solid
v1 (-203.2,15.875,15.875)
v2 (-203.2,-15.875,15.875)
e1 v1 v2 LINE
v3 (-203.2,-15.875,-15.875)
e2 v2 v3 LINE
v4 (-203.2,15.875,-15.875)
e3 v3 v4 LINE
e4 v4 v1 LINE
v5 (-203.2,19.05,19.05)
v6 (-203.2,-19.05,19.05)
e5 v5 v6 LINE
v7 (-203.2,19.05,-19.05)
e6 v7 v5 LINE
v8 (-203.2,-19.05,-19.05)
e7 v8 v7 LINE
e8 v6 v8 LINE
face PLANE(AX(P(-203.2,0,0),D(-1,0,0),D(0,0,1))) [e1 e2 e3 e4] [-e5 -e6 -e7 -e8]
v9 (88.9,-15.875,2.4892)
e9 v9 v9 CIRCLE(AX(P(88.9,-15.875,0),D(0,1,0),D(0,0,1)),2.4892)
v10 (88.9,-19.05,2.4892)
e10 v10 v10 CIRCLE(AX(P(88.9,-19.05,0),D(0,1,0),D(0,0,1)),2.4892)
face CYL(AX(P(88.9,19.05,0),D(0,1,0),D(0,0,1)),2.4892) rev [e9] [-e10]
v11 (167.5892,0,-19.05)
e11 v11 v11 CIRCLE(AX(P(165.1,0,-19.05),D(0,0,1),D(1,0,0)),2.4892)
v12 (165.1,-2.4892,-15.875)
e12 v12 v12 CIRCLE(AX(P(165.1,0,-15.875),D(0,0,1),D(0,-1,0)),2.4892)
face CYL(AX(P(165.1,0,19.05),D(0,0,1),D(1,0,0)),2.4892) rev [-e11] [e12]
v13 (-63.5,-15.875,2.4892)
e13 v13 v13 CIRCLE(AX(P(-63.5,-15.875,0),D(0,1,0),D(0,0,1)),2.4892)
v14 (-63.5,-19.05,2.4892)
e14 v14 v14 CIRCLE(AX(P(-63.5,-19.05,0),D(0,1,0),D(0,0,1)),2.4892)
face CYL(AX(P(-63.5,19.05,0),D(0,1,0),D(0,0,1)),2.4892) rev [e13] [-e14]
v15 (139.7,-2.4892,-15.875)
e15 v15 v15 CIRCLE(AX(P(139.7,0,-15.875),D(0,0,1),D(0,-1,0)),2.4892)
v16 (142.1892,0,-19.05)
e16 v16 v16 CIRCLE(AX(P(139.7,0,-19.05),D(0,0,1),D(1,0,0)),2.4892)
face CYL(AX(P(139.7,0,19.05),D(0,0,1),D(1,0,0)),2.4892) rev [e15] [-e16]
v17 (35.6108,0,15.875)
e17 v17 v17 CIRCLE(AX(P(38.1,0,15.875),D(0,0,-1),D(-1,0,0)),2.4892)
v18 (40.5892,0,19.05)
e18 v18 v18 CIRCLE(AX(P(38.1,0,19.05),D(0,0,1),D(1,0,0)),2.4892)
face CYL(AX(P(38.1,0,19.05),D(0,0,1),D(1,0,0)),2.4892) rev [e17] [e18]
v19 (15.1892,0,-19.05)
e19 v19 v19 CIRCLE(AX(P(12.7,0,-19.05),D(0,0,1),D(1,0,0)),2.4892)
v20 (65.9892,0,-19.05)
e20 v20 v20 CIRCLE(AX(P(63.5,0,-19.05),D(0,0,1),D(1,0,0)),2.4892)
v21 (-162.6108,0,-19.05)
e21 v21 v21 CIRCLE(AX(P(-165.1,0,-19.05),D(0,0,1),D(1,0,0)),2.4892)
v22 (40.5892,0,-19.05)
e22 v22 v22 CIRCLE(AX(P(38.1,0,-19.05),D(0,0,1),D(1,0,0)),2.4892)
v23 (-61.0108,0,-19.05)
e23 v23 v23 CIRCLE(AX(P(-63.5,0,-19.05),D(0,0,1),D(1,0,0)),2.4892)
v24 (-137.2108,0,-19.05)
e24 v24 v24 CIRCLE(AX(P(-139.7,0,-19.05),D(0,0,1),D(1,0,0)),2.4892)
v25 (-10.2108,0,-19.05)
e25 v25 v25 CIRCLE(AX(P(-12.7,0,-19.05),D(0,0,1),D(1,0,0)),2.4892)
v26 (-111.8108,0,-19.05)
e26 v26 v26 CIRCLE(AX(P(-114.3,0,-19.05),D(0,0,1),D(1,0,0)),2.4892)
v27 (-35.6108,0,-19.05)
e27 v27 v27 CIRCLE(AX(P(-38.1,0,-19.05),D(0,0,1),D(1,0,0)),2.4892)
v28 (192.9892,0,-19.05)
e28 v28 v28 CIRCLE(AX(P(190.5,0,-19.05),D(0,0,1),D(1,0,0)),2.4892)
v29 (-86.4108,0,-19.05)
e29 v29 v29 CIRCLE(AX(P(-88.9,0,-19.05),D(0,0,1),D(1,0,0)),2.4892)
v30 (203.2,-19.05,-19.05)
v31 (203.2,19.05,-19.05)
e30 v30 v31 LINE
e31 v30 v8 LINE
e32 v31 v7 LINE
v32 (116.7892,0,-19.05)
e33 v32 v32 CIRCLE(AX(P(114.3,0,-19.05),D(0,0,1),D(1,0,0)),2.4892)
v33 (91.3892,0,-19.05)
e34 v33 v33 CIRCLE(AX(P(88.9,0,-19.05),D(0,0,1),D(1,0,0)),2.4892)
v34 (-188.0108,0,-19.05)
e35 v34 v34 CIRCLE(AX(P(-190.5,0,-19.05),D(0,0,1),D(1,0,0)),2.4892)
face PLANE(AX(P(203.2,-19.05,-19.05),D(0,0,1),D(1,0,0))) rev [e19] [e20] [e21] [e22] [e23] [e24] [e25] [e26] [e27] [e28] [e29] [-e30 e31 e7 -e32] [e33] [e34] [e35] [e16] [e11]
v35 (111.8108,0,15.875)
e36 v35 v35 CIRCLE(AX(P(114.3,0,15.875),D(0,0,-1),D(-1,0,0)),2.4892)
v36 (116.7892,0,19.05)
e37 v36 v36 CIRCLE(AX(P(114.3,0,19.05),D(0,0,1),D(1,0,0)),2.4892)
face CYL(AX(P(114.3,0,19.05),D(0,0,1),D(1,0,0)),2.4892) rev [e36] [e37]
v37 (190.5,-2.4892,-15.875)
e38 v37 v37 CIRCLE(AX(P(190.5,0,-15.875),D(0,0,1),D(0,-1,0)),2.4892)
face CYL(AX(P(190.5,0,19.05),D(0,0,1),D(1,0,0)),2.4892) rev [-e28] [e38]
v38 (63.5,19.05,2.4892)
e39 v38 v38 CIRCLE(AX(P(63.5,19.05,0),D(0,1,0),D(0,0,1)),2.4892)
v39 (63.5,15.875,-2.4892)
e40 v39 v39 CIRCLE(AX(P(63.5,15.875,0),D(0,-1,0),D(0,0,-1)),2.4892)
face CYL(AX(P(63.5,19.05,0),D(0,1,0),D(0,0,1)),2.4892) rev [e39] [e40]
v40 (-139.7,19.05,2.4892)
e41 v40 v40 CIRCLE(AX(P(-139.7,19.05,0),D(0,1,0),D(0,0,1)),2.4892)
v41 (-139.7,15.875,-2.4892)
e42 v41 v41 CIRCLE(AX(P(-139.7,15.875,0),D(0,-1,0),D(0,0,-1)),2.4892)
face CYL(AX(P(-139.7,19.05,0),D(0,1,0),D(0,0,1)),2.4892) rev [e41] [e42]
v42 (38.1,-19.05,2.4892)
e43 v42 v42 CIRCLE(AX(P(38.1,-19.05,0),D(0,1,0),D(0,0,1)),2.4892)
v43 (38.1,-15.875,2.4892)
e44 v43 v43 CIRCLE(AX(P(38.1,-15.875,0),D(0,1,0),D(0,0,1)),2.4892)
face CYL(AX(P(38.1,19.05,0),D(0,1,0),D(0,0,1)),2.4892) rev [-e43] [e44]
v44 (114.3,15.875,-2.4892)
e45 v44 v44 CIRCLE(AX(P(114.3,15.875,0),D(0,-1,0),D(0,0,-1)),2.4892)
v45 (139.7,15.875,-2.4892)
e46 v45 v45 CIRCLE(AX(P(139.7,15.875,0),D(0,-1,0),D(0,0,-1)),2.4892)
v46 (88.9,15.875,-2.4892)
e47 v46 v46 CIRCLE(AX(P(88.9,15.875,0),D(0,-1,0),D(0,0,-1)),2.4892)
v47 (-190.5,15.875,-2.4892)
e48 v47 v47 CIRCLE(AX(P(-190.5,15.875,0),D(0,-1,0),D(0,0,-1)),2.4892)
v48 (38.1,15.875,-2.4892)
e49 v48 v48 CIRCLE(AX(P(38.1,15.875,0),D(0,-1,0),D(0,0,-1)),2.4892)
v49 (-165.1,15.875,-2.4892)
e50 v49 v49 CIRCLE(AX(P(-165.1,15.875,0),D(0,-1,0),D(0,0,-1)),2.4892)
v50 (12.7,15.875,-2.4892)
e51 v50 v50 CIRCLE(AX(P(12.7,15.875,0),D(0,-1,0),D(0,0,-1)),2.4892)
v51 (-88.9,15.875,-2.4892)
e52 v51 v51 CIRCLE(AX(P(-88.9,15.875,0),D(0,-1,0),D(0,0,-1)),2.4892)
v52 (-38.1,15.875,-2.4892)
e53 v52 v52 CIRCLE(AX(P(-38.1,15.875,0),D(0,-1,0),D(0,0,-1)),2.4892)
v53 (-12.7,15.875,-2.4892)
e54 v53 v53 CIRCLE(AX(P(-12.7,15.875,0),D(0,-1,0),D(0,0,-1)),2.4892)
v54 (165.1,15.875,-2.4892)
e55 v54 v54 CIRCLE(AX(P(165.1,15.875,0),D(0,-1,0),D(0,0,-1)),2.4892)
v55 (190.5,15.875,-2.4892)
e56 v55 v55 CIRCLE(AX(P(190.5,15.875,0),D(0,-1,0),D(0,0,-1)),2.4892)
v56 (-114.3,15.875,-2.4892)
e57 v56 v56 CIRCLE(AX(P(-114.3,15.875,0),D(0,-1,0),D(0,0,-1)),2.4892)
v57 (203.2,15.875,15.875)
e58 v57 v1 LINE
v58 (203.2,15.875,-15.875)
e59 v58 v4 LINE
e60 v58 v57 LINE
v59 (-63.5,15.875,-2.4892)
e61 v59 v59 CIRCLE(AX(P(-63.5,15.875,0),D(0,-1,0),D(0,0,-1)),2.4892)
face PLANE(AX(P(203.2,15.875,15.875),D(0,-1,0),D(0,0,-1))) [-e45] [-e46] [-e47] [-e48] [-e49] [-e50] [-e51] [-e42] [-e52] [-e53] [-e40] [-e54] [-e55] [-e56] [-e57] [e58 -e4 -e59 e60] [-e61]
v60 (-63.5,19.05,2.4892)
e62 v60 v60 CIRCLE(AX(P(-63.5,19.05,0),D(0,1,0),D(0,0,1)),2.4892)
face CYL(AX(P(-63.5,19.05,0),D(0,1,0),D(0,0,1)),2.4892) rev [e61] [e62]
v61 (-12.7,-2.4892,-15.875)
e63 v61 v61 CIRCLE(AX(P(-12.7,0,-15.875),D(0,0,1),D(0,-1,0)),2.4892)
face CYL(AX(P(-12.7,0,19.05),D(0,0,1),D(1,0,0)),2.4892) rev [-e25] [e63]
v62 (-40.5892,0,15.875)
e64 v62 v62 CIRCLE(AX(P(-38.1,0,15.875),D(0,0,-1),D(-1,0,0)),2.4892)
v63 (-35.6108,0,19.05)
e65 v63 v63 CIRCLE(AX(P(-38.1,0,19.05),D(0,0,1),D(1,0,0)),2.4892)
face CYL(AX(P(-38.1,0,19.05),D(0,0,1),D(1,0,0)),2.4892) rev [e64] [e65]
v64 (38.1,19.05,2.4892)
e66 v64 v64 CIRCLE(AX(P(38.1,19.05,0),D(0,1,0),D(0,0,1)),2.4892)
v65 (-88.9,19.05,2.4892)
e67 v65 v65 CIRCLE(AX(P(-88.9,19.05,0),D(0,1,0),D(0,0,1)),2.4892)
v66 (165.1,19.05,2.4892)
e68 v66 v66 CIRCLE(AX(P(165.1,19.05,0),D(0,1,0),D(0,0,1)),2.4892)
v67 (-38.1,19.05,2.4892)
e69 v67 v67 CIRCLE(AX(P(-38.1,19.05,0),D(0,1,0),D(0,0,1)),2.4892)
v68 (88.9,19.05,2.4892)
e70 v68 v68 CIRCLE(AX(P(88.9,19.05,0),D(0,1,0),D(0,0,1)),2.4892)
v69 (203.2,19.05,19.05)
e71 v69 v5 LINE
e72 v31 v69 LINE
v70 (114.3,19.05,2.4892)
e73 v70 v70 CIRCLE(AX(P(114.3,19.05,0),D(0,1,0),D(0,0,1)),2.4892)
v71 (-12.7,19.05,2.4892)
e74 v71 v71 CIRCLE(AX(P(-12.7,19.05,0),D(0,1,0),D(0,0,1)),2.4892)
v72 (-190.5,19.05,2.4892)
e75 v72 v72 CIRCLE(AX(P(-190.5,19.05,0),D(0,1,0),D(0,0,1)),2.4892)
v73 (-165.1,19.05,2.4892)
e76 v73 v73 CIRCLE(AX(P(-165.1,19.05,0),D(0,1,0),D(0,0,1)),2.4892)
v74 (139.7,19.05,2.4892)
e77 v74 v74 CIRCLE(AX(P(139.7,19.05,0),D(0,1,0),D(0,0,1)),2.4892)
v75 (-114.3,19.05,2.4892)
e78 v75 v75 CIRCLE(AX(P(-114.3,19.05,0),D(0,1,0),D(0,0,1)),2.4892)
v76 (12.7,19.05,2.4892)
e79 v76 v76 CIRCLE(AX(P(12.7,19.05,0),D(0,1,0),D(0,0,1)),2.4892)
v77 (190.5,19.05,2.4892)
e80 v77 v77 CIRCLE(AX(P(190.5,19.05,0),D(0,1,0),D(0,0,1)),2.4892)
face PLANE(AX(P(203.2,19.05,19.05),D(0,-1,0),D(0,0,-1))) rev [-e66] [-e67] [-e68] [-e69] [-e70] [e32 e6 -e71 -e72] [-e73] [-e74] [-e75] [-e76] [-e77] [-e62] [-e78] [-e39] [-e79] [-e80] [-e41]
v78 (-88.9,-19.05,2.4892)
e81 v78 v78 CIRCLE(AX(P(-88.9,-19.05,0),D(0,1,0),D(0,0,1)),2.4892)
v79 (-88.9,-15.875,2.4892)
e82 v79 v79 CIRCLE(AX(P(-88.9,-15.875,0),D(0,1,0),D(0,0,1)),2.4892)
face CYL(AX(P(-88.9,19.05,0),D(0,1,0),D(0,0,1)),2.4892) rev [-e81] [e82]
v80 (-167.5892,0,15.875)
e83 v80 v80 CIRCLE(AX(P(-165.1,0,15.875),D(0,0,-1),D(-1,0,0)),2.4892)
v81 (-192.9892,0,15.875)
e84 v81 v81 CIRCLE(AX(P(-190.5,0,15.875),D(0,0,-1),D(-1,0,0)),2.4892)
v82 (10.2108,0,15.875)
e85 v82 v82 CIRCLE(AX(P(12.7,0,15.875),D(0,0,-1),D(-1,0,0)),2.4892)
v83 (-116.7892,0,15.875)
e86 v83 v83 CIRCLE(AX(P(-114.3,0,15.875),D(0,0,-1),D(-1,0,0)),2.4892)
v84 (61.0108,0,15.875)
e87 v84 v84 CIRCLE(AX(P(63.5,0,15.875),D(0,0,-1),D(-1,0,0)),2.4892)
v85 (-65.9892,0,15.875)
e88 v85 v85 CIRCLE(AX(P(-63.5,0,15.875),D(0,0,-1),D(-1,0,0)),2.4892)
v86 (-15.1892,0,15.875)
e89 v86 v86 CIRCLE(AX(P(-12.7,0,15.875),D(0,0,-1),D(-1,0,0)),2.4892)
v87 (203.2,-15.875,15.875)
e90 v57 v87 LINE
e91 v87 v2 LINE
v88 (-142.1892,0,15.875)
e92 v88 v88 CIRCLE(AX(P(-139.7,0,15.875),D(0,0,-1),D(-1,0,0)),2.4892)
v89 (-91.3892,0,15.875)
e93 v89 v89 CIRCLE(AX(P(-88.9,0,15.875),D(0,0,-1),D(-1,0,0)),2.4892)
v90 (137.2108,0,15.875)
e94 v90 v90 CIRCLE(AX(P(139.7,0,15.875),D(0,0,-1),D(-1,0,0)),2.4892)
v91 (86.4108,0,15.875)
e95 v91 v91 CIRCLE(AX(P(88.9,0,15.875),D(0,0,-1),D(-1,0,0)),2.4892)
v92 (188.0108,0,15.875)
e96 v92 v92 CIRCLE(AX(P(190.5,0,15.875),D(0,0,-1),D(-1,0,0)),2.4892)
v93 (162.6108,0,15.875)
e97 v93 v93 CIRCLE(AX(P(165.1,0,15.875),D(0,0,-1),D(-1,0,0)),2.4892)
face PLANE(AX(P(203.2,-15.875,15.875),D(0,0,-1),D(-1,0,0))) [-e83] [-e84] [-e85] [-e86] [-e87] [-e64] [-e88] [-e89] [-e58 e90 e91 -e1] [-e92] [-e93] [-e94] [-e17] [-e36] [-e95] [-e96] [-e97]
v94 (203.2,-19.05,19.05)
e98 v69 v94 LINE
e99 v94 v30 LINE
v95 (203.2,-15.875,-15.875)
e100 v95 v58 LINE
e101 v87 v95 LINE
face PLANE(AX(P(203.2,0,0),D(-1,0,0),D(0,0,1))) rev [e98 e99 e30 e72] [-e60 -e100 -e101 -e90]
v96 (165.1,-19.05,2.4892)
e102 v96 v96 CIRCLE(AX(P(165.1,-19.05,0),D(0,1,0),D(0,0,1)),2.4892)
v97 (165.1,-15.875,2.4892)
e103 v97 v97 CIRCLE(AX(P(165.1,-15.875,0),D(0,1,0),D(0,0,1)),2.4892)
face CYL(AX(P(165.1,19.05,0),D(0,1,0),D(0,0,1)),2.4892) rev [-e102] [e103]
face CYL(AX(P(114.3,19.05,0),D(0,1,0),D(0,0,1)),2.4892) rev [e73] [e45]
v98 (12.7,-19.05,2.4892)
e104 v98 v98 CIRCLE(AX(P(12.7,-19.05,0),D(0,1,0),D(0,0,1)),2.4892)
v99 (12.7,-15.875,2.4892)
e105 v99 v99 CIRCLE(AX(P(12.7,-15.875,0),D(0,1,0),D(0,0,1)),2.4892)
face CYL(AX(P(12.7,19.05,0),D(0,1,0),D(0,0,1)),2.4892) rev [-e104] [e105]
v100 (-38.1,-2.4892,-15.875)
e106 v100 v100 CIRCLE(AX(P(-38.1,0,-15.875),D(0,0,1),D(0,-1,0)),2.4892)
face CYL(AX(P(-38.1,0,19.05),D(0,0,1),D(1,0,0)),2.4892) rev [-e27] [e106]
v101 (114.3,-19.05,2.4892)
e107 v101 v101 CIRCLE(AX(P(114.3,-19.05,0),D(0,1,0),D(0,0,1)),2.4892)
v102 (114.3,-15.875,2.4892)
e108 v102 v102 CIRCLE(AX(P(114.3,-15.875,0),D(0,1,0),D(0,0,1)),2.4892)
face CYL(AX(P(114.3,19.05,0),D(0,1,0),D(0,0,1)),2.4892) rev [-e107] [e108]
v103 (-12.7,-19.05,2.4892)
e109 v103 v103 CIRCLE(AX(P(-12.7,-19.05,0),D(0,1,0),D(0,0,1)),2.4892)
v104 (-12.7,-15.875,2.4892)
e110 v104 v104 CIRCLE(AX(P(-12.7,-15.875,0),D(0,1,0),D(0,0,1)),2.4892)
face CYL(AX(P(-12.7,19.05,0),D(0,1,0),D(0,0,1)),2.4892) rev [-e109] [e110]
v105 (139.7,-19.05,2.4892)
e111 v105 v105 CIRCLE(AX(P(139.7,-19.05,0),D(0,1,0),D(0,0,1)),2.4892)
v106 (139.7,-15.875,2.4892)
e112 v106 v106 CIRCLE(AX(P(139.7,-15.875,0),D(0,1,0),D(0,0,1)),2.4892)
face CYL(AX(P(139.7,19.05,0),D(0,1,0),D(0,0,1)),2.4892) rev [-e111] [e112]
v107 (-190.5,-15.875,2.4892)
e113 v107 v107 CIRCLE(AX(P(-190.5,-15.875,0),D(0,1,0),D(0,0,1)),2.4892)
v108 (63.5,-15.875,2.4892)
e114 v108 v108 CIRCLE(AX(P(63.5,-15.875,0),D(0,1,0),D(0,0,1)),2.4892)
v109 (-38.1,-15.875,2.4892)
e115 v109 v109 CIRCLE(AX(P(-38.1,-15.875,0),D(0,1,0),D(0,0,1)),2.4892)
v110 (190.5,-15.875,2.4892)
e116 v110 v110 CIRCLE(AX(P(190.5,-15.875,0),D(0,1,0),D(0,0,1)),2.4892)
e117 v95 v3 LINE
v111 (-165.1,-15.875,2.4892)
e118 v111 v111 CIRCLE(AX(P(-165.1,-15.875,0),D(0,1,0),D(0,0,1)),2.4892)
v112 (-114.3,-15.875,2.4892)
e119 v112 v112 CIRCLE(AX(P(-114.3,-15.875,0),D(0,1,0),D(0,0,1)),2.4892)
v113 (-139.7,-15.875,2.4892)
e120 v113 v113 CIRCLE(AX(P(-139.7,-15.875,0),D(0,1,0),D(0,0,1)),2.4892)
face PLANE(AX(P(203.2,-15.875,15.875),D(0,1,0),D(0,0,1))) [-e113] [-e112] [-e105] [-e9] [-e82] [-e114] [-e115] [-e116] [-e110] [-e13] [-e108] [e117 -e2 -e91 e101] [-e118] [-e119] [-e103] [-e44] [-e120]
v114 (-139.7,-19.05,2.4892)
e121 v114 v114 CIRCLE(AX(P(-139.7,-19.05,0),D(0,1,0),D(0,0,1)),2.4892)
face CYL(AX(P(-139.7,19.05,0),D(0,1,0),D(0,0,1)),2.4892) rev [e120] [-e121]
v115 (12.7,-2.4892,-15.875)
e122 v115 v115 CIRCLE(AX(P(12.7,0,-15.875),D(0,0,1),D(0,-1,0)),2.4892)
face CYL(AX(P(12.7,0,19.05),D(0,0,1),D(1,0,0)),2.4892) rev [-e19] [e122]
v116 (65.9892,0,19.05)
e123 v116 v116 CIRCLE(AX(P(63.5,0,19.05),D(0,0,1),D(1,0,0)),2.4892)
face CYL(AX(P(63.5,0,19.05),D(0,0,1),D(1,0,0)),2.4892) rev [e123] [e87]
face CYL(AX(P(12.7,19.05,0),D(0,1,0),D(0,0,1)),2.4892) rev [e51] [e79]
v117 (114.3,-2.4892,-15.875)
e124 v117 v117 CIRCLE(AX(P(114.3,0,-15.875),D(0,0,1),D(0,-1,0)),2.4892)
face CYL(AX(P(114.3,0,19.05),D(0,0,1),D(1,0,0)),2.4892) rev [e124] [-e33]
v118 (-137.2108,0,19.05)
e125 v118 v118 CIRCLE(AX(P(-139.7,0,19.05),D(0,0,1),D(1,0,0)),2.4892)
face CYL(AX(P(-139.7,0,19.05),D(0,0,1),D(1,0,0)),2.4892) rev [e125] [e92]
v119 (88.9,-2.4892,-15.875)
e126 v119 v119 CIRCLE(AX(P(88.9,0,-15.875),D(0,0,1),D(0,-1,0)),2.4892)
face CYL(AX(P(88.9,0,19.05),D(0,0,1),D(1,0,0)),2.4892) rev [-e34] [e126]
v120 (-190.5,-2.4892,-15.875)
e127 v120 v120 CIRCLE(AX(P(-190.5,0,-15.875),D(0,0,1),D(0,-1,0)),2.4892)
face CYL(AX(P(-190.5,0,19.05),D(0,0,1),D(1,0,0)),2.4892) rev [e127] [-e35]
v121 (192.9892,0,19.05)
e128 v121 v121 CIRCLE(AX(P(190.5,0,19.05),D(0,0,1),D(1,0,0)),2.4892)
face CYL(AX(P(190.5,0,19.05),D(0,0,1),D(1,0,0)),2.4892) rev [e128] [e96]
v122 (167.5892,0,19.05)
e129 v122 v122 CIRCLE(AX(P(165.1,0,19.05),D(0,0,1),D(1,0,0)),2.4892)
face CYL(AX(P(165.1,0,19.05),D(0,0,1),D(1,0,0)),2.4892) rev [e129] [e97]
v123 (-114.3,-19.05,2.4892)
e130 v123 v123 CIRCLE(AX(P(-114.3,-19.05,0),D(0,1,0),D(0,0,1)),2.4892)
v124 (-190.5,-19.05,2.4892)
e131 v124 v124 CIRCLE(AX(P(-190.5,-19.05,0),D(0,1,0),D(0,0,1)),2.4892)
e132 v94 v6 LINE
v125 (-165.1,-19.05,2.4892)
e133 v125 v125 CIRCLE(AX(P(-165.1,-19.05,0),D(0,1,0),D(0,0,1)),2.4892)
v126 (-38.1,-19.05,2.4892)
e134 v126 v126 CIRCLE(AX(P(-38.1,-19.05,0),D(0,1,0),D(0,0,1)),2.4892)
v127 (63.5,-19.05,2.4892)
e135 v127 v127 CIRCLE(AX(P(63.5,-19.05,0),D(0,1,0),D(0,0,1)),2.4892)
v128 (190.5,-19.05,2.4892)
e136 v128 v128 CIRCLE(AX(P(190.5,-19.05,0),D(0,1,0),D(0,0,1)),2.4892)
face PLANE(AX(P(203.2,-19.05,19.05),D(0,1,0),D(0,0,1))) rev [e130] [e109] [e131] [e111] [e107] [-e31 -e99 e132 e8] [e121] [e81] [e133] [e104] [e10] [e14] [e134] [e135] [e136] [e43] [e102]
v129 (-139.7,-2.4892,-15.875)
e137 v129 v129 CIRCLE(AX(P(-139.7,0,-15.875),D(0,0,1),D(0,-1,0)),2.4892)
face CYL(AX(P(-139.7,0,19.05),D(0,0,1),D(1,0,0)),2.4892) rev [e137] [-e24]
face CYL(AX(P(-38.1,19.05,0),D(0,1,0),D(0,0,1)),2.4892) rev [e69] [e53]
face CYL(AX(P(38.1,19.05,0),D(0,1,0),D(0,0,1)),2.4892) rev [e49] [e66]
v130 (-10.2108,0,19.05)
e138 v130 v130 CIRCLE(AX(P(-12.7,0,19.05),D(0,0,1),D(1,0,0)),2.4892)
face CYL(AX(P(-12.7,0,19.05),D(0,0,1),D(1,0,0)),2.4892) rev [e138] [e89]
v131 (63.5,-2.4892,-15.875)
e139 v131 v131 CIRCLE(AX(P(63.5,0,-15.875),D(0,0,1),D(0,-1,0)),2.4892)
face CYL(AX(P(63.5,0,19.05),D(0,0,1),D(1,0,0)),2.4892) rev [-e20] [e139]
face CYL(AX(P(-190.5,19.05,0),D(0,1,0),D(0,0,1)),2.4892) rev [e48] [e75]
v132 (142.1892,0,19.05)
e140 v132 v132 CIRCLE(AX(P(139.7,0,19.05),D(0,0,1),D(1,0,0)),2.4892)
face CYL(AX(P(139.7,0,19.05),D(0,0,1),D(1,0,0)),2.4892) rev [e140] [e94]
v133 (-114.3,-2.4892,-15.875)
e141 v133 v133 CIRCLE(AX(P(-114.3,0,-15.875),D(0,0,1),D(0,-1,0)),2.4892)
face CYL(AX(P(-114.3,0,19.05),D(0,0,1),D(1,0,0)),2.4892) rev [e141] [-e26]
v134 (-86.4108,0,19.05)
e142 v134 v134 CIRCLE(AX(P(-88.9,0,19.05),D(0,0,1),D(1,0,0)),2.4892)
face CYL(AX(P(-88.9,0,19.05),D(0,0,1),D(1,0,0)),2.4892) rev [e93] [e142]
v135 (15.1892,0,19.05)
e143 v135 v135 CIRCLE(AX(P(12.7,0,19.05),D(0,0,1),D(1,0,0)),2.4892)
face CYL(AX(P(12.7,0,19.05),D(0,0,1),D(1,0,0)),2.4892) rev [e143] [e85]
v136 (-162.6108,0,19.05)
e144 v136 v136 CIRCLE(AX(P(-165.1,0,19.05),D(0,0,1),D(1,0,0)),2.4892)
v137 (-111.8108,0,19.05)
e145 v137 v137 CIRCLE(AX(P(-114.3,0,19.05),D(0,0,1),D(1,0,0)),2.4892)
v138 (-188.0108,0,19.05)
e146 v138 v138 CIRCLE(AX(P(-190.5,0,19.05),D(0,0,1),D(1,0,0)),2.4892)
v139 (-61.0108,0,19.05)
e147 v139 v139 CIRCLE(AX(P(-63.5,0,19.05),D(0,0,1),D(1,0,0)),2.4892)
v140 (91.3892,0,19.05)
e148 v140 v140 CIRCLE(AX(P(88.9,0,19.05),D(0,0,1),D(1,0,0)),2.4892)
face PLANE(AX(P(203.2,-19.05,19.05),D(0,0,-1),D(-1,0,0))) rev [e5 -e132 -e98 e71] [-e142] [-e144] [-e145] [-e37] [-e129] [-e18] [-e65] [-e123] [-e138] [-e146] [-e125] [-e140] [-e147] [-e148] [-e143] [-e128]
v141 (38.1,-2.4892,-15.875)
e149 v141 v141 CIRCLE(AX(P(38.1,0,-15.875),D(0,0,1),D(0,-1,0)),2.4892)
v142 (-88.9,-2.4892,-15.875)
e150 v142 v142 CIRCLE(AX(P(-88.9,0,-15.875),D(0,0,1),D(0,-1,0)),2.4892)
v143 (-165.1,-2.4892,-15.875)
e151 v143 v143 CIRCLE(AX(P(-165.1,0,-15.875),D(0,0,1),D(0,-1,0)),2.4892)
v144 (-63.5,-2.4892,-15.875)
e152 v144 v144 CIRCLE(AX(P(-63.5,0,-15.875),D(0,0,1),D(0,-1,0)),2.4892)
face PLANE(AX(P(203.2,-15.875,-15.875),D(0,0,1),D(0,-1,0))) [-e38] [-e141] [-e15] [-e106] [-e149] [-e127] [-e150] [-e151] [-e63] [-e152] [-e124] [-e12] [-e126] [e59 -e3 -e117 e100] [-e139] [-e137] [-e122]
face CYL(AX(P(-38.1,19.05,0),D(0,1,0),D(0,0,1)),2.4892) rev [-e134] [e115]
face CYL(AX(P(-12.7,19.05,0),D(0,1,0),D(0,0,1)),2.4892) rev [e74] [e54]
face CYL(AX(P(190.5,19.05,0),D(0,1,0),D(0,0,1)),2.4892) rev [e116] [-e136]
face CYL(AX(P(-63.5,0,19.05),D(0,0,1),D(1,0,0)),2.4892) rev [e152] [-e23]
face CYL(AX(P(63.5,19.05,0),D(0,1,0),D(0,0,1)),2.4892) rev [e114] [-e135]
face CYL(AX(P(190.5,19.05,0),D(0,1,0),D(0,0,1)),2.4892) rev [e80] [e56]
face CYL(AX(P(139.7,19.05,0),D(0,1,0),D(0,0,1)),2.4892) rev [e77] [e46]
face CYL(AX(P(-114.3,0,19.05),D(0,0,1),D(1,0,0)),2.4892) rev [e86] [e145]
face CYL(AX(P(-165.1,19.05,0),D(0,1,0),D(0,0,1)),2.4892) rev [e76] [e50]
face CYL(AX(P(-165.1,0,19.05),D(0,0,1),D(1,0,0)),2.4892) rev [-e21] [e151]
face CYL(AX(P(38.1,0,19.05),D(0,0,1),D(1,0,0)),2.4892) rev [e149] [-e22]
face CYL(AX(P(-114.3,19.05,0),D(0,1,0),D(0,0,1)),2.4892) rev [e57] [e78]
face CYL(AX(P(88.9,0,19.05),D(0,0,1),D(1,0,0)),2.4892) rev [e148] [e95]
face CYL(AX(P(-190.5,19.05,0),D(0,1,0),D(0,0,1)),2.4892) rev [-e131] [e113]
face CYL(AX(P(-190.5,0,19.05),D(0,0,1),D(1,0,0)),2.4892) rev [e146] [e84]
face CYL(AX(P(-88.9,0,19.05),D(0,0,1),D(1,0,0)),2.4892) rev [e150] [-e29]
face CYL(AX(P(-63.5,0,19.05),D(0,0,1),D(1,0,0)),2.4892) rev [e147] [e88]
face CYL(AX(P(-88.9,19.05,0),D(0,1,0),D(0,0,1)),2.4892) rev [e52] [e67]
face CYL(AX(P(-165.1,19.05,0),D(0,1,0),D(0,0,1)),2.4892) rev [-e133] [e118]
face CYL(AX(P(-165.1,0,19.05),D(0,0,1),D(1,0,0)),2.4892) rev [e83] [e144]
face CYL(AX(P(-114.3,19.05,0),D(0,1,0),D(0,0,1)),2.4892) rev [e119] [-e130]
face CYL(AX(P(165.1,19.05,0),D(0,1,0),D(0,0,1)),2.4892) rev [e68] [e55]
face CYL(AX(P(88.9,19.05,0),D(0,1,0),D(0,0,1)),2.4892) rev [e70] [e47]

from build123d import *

# Parameters (mm, degrees)
SKETCH1_W             = 38.1
SKETCH1_H             = 38.1
SKETCH1_W_2           = 31.75
SKETCH1_H_2           = 31.75
BOSS_EXTRUDE1_DEPTH   = 203.2
SKETCH3_W             = 2.4892
SKETCH3_H             = 38.1
SKETCH3_AT_POINT_2_W  = 2.4892
SKETCH3_AT_POINT_2_H  = 38.1
LPATTERN1_START       = -19.05
LPATTERN1_OUTLINE_R   = 2.4892
LPATTERN1_DEPTH       = 38.1
LPATTERN1_2_OUTLINE_R = 2.4892
LPATTERN1_2_DEPTH     = 38.1


# Read off the part's stored shape, not the designer's step: LPattern1
with BuildPart() as part:
    # Sketch1 → Boss-Extrude1 (new, symmetric)
    with BuildSketch(Plane(origin=(0, 0, 0), x_dir=(0, 0, -1), z_dir=(1, 0, 0))):
        Rectangle(SKETCH1_W, SKETCH1_H)
        Rectangle(SKETCH1_W_2, SKETCH1_H_2, mode=Mode.SUBTRACT)
    extrude(amount=BOSS_EXTRUDE1_DEPTH, both=True)

    # Sketch3 → #9 (0.196) Diameter Hole1 (revolve, cut)
    with BuildSketch(Plane(origin=(190.5, 19.05, 0), x_dir=(0, 0, 1), z_dir=(1, 0, 0))):
        with Locations((1.2446, 19.05)):
            Rectangle(SKETCH3_W, SKETCH3_H)
    revolve(axis=Axis((190.5, 25.4, 0), (0, -1, 0)), mode=Mode.SUBTRACT)

    # Sketch3 at point 2 (carried to point 2, square into its face) → #9 (0.196) Diameter Hole1 at 2 (revolve, cut)
    with BuildSketch(Plane(origin=(190.5, 0, 19.05), x_dir=(0, -1, 0), z_dir=(1, 0, 0))):
        with Locations((1.2446, 19.05)):
            Rectangle(SKETCH3_AT_POINT_2_W, SKETCH3_AT_POINT_2_H)
    revolve(axis=Axis((190.5, 0, 25.4), (0, 0, -1)), mode=Mode.SUBTRACT)

    # LPattern1 outline → LPattern1 (cut)
    with BuildSketch(Plane.XY.offset(LPATTERN1_START)):
        with Locations((165.1, 0)):
            Circle(LPATTERN1_OUTLINE_R)
        with Locations((139.7, 0)):
            Circle(LPATTERN1_OUTLINE_R)
        with Locations((114.3, 0)):
            Circle(LPATTERN1_OUTLINE_R)
        with Locations((88.9, 0)):
            Circle(LPATTERN1_OUTLINE_R)
        with Locations((63.5, 0)):
            Circle(LPATTERN1_OUTLINE_R)
        with Locations((38.1, 0)):
            Circle(LPATTERN1_OUTLINE_R)
        with Locations((12.7, 0)):
            Circle(LPATTERN1_OUTLINE_R)
        with Locations((-12.7, 0)):
            Circle(LPATTERN1_OUTLINE_R)
        with Locations((-38.1, 0)):
            Circle(LPATTERN1_OUTLINE_R)
        with Locations((-63.5, 0)):
            Circle(LPATTERN1_OUTLINE_R)
        with Locations((-88.9, 0)):
            Circle(LPATTERN1_OUTLINE_R)
        with Locations((-114.3, 0)):
            Circle(LPATTERN1_OUTLINE_R)
        with Locations((-139.7, 0)):
            Circle(LPATTERN1_OUTLINE_R)
        with Locations((-165.1, 0)):
            Circle(LPATTERN1_OUTLINE_R)
        with Locations((-190.5, 0)):
            Circle(LPATTERN1_OUTLINE_R)
    extrude(amount=LPATTERN1_DEPTH, mode=Mode.SUBTRACT)

    # LPattern1 2 outline → LPattern1 2 (cut)
    with BuildSketch(Plane(origin=(0, 0, 0), x_dir=(1, 0, 0), z_dir=(0, 1, 0)).offset(LPATTERN1_START)):
        with Locations((165.1, 0)):
            Circle(LPATTERN1_2_OUTLINE_R)
        with Locations((139.7, 0)):
            Circle(LPATTERN1_2_OUTLINE_R)
        with Locations((114.3, 0)):
            Circle(LPATTERN1_2_OUTLINE_R)
        with Locations((88.9, 0)):
            Circle(LPATTERN1_2_OUTLINE_R)
        with Locations((63.5, 0)):
            Circle(LPATTERN1_2_OUTLINE_R)
        with Locations((38.1, 0)):
            Circle(LPATTERN1_2_OUTLINE_R)
        with Locations((12.7, 0)):
            Circle(LPATTERN1_2_OUTLINE_R)
        with Locations((-12.7, 0)):
            Circle(LPATTERN1_2_OUTLINE_R)
        with Locations((-38.1, 0)):
            Circle(LPATTERN1_2_OUTLINE_R)
        with Locations((-63.5, 0)):
            Circle(LPATTERN1_2_OUTLINE_R)
        with Locations((-88.9, 0)):
            Circle(LPATTERN1_2_OUTLINE_R)
        with Locations((-114.3, 0)):
            Circle(LPATTERN1_2_OUTLINE_R)
        with Locations((-139.7, 0)):
            Circle(LPATTERN1_2_OUTLINE_R)
        with Locations((-165.1, 0)):
            Circle(LPATTERN1_2_OUTLINE_R)
        with Locations((-190.5, 0)):
            Circle(LPATTERN1_2_OUTLINE_R)
    extrude(amount=LPATTERN1_2_DEPTH, mode=Mode.SUBTRACT)


solid = part.part
